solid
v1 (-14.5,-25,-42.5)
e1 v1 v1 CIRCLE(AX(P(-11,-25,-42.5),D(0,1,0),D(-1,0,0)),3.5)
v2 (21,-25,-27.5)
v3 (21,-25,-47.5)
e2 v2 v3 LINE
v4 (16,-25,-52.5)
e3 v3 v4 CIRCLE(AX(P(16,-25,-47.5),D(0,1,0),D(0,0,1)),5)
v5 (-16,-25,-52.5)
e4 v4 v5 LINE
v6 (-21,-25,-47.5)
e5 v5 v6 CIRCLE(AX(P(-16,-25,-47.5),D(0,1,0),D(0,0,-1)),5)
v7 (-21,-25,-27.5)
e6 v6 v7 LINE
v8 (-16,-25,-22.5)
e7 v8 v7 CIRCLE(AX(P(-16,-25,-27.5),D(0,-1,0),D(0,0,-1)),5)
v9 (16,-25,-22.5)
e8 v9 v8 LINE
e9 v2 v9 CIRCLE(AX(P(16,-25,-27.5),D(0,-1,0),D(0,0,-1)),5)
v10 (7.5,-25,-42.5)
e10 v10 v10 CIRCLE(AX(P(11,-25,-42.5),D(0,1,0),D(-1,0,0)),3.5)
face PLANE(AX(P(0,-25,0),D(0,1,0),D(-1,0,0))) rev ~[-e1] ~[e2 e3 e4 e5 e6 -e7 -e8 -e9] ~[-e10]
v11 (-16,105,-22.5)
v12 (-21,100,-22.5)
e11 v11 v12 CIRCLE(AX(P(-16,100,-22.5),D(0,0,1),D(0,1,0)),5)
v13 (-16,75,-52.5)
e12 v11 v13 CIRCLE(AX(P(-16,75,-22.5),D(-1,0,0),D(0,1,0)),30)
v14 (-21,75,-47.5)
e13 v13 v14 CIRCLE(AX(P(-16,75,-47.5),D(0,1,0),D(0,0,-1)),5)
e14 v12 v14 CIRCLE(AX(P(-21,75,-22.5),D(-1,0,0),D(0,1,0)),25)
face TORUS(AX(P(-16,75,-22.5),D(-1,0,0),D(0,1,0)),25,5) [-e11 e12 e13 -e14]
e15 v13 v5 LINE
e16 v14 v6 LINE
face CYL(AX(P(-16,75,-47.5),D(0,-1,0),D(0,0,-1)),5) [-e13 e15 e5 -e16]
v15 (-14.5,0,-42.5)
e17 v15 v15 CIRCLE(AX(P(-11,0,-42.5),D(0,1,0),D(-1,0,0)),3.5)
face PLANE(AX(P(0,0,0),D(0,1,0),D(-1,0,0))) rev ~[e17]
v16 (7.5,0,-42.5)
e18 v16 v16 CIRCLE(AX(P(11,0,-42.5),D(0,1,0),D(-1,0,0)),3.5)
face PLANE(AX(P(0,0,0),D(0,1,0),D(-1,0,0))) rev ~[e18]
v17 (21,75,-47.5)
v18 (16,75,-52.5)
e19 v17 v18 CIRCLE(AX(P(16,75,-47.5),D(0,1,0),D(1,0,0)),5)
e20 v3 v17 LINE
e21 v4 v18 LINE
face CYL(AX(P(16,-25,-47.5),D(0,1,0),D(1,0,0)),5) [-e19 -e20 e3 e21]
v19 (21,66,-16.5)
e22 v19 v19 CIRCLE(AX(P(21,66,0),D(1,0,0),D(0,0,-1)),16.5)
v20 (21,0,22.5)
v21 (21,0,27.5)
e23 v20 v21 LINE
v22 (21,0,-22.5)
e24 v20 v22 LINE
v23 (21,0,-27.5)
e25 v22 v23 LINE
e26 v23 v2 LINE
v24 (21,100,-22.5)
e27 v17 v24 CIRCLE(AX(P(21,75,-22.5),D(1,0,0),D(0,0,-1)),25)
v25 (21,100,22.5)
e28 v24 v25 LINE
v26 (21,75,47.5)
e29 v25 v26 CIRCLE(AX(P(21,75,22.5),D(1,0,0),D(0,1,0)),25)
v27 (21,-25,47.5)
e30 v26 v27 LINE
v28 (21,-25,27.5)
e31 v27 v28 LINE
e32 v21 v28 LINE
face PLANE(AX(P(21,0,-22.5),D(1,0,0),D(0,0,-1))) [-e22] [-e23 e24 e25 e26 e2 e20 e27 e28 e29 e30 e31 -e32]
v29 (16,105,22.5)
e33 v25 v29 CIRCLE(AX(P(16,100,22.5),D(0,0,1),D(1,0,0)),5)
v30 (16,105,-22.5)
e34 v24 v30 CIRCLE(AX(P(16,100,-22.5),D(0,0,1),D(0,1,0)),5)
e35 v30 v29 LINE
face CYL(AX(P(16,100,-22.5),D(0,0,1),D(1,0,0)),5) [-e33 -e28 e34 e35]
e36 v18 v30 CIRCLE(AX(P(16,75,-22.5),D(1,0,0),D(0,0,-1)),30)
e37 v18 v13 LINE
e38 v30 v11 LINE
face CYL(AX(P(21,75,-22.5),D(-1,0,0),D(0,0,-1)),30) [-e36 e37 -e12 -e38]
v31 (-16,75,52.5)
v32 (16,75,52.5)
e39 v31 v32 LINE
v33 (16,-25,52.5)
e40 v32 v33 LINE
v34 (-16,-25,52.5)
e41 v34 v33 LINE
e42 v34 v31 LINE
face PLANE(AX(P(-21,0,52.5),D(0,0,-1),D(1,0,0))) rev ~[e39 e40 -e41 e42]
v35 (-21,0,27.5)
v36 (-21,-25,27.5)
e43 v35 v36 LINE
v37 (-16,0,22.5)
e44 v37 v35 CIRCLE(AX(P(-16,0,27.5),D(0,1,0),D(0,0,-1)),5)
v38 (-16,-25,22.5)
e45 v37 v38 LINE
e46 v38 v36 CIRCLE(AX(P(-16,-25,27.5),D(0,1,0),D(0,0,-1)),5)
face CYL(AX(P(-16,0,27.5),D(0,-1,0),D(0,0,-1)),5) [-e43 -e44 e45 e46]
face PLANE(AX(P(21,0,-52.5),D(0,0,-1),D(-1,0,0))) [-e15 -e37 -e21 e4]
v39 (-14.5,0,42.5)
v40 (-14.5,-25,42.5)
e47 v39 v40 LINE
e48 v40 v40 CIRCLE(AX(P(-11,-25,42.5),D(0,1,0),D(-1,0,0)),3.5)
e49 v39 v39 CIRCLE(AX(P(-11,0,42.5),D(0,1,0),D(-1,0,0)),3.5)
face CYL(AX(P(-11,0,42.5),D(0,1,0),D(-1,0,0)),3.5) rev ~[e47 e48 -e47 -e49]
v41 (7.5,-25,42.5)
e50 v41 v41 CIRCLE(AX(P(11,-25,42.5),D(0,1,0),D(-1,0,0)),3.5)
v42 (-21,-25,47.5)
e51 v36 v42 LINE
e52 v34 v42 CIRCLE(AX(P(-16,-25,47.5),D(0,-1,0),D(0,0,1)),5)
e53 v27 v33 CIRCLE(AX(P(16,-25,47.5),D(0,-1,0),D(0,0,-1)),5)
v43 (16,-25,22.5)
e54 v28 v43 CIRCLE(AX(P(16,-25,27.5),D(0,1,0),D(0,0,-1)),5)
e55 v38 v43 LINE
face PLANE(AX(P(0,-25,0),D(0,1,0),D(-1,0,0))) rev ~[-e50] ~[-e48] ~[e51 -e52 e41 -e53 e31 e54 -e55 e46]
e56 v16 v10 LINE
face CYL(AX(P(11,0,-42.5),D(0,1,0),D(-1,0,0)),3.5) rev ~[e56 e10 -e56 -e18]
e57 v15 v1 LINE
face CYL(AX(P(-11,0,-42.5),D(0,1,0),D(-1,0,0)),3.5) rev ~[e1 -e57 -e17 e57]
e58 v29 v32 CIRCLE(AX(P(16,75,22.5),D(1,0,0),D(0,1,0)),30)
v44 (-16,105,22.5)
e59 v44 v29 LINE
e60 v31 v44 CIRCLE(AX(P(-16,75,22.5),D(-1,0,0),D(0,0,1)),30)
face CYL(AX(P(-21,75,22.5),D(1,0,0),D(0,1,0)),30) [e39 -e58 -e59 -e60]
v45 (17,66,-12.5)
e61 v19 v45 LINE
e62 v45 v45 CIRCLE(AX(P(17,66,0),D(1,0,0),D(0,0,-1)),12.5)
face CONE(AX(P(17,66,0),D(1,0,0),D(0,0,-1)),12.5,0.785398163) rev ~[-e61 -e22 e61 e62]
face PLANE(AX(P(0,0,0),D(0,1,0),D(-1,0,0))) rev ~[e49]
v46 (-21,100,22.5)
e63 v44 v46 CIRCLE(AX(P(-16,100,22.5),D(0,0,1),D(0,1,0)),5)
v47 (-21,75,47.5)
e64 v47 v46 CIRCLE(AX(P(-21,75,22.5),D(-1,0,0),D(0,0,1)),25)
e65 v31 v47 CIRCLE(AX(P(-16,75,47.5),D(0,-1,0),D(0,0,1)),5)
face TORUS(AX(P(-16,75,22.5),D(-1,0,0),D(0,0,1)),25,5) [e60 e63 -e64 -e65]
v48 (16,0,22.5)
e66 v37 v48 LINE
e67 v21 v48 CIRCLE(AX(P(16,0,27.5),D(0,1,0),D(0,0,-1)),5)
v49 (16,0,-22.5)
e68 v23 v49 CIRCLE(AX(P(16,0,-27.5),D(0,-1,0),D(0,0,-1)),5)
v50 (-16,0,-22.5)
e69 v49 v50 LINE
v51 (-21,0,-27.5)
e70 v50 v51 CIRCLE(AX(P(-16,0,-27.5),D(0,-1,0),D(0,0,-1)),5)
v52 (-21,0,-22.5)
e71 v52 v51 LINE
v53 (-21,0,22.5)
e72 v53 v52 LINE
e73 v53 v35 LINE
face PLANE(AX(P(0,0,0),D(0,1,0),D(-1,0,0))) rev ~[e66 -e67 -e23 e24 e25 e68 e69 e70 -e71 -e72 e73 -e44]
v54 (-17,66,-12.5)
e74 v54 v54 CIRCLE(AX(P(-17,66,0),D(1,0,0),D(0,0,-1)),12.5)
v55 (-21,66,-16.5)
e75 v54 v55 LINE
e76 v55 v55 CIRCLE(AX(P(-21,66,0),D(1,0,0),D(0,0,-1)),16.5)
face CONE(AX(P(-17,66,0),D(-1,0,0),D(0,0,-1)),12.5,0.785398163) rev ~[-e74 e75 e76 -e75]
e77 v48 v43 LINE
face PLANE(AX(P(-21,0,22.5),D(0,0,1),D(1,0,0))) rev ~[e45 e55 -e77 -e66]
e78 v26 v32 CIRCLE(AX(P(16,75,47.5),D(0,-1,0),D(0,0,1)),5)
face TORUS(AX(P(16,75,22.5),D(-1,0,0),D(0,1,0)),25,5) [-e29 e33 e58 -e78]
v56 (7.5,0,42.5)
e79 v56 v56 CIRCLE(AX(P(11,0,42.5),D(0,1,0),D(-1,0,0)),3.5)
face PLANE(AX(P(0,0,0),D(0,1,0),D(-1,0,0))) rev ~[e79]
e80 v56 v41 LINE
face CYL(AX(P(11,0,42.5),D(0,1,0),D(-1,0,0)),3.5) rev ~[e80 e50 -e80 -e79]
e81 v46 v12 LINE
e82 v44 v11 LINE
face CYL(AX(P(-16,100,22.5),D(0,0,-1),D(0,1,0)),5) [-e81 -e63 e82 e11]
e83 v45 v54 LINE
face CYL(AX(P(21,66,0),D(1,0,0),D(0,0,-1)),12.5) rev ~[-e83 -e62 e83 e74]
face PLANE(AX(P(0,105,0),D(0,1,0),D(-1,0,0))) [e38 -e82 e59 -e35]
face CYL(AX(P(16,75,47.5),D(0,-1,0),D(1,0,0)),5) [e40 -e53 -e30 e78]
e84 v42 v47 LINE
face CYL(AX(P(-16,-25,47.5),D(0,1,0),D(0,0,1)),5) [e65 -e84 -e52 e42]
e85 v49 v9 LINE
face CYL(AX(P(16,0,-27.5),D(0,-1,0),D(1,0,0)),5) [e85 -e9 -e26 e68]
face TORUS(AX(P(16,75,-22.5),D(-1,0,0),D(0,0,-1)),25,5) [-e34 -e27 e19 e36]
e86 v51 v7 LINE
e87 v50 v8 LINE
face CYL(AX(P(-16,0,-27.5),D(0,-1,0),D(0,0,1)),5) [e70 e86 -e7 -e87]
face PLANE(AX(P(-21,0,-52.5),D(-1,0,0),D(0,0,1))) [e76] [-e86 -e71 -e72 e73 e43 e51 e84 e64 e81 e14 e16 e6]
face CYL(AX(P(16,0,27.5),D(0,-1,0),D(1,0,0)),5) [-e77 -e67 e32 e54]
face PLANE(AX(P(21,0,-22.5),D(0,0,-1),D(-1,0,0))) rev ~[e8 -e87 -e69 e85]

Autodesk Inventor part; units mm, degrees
ref_plane "YZ Plane" through (0, 0, 0) normal (1, 0, 0) x (0, 1, 0)
ref_plane "XZ Plane" through (0, 0, 0) normal (0, 1, 0) x (-1, 0, 0)
ref_plane "XY Plane" through (0, 0, 0) normal (0, 0, 1) x (1, 0, 0)
sketch "Sketch1" plane through (0, 0, 0) normal (0, 1, 0) x (-1, 0, 0)
  line L0 (-21, -52.5) -> (21, -52.5)
  line L1 (21, -52.5) -> (21, 52.5)
  line L2 (21, 52.5) -> (-21, 52.5)
  line L3 (-21, 52.5) -> (-21, -52.5)
  line L4 (-21, -52.5) -> (21, 52.5) construction
  line L5 (21, -52.5) -> (-21, 52.5) construction
  line L6 (-11, -42.5) -> (11, -42.5) construction
  line L7 (11, -42.5) -> (11, 42.5) construction
  line L8 (11, 42.5) -> (-11, 42.5) construction
  line L9 (-11, 42.5) -> (-11, -42.5) construction
  line L10 (-11, -42.5) -> (11, 42.5) construction
  line L11 (11, -42.5) -> (-11, 42.5) construction
  line L12 (-21, -22.5) -> (21, -22.5)
  line L13 (21, -22.5) -> (21, 22.5)
  line L14 (21, 22.5) -> (-21, 22.5)
  line L15 (-21, 22.5) -> (-21, -22.5)
  line L16 (-21, -22.5) -> (21, 22.5) construction
  line L17 (21, -22.5) -> (-21, 22.5) construction
  circle A0 centre (11, 42.5) radius 3.5
  circle A1 centre (-11, 42.5) radius 3.5
  circle A2 centre (11, -42.5) radius 3.5
  circle A3 centre (-11, -42.5) radius 3.5
  point P0 (0, 0)
  dimension "d0" = 22
  dimension "d1" = 85
  dimension "d2" = 10
  dimension "d3" = 10
  dimension "d4" = 45
  dimension "d5" = 7
  dimension "d6" = 7
  dimension "d8" = 7
  dimension "d9" = 7
extrude "Extrusion1" add sketch "Sketch1" against normal blind 25 contours L3 L12 L1 L0 | L3 L2 L1 L14
extrude "Extrusion2" add sketch "Sketch1" along normal blind 105 contours L3 L12 L1 L0 | L3 L14 L1 L12 | L3 L2 L1 L14 | A0 | A1 | A2 | A3
sketch "Sketch2" plane through (21, -25, -22.5) normal (1, 0, 0) x (0, 0, -1)
  circle A0 centre (-22.5, 91) radius 12.5
  line L0 (-45, 0) -> (-75, 0) projected
  line L1 (-22.5, 25) -> (-22.5, 91) construction
  dimension "d14" = 25
  dimension "d15" = 91
extrude "Extrusion3" cut sketch "Sketch2" against normal through all
fillet "Fillet1" radius 30 2 edges at (0, 105, 52.5) (0, 105, -52.5)
fillet "Fillet2" radius 5 14 edges at (21, 96.2132, 43.7132) (21, 105, 0) (21, 96.2132, -43.7132) (21, 25, -52.5) (21, 25, 52.5) (-21, 25, 52.5) (-21, 105, 0) (-21, 96.2132, -43.7132) (-21, 25, -52.5) (-21, 96.2132, 43.7132) (21, -12.5, 22.5) (21, -12.5, -22.5) (-21, -12.5, -22.5) (-21, -12.5, 22.5)
chamfer "Chamfer1" distance 4 angle 45 2 edges at (21, 66, 12.5) (-21, 66, 12.5)
equation "\"d3\" = d2"
equation "\"d6\" = d5"
equation "\"d8\" = d5"
equation "\"d9\" = d5"
properties part number "BALL SCREW MIDDLE SUPPORT"
